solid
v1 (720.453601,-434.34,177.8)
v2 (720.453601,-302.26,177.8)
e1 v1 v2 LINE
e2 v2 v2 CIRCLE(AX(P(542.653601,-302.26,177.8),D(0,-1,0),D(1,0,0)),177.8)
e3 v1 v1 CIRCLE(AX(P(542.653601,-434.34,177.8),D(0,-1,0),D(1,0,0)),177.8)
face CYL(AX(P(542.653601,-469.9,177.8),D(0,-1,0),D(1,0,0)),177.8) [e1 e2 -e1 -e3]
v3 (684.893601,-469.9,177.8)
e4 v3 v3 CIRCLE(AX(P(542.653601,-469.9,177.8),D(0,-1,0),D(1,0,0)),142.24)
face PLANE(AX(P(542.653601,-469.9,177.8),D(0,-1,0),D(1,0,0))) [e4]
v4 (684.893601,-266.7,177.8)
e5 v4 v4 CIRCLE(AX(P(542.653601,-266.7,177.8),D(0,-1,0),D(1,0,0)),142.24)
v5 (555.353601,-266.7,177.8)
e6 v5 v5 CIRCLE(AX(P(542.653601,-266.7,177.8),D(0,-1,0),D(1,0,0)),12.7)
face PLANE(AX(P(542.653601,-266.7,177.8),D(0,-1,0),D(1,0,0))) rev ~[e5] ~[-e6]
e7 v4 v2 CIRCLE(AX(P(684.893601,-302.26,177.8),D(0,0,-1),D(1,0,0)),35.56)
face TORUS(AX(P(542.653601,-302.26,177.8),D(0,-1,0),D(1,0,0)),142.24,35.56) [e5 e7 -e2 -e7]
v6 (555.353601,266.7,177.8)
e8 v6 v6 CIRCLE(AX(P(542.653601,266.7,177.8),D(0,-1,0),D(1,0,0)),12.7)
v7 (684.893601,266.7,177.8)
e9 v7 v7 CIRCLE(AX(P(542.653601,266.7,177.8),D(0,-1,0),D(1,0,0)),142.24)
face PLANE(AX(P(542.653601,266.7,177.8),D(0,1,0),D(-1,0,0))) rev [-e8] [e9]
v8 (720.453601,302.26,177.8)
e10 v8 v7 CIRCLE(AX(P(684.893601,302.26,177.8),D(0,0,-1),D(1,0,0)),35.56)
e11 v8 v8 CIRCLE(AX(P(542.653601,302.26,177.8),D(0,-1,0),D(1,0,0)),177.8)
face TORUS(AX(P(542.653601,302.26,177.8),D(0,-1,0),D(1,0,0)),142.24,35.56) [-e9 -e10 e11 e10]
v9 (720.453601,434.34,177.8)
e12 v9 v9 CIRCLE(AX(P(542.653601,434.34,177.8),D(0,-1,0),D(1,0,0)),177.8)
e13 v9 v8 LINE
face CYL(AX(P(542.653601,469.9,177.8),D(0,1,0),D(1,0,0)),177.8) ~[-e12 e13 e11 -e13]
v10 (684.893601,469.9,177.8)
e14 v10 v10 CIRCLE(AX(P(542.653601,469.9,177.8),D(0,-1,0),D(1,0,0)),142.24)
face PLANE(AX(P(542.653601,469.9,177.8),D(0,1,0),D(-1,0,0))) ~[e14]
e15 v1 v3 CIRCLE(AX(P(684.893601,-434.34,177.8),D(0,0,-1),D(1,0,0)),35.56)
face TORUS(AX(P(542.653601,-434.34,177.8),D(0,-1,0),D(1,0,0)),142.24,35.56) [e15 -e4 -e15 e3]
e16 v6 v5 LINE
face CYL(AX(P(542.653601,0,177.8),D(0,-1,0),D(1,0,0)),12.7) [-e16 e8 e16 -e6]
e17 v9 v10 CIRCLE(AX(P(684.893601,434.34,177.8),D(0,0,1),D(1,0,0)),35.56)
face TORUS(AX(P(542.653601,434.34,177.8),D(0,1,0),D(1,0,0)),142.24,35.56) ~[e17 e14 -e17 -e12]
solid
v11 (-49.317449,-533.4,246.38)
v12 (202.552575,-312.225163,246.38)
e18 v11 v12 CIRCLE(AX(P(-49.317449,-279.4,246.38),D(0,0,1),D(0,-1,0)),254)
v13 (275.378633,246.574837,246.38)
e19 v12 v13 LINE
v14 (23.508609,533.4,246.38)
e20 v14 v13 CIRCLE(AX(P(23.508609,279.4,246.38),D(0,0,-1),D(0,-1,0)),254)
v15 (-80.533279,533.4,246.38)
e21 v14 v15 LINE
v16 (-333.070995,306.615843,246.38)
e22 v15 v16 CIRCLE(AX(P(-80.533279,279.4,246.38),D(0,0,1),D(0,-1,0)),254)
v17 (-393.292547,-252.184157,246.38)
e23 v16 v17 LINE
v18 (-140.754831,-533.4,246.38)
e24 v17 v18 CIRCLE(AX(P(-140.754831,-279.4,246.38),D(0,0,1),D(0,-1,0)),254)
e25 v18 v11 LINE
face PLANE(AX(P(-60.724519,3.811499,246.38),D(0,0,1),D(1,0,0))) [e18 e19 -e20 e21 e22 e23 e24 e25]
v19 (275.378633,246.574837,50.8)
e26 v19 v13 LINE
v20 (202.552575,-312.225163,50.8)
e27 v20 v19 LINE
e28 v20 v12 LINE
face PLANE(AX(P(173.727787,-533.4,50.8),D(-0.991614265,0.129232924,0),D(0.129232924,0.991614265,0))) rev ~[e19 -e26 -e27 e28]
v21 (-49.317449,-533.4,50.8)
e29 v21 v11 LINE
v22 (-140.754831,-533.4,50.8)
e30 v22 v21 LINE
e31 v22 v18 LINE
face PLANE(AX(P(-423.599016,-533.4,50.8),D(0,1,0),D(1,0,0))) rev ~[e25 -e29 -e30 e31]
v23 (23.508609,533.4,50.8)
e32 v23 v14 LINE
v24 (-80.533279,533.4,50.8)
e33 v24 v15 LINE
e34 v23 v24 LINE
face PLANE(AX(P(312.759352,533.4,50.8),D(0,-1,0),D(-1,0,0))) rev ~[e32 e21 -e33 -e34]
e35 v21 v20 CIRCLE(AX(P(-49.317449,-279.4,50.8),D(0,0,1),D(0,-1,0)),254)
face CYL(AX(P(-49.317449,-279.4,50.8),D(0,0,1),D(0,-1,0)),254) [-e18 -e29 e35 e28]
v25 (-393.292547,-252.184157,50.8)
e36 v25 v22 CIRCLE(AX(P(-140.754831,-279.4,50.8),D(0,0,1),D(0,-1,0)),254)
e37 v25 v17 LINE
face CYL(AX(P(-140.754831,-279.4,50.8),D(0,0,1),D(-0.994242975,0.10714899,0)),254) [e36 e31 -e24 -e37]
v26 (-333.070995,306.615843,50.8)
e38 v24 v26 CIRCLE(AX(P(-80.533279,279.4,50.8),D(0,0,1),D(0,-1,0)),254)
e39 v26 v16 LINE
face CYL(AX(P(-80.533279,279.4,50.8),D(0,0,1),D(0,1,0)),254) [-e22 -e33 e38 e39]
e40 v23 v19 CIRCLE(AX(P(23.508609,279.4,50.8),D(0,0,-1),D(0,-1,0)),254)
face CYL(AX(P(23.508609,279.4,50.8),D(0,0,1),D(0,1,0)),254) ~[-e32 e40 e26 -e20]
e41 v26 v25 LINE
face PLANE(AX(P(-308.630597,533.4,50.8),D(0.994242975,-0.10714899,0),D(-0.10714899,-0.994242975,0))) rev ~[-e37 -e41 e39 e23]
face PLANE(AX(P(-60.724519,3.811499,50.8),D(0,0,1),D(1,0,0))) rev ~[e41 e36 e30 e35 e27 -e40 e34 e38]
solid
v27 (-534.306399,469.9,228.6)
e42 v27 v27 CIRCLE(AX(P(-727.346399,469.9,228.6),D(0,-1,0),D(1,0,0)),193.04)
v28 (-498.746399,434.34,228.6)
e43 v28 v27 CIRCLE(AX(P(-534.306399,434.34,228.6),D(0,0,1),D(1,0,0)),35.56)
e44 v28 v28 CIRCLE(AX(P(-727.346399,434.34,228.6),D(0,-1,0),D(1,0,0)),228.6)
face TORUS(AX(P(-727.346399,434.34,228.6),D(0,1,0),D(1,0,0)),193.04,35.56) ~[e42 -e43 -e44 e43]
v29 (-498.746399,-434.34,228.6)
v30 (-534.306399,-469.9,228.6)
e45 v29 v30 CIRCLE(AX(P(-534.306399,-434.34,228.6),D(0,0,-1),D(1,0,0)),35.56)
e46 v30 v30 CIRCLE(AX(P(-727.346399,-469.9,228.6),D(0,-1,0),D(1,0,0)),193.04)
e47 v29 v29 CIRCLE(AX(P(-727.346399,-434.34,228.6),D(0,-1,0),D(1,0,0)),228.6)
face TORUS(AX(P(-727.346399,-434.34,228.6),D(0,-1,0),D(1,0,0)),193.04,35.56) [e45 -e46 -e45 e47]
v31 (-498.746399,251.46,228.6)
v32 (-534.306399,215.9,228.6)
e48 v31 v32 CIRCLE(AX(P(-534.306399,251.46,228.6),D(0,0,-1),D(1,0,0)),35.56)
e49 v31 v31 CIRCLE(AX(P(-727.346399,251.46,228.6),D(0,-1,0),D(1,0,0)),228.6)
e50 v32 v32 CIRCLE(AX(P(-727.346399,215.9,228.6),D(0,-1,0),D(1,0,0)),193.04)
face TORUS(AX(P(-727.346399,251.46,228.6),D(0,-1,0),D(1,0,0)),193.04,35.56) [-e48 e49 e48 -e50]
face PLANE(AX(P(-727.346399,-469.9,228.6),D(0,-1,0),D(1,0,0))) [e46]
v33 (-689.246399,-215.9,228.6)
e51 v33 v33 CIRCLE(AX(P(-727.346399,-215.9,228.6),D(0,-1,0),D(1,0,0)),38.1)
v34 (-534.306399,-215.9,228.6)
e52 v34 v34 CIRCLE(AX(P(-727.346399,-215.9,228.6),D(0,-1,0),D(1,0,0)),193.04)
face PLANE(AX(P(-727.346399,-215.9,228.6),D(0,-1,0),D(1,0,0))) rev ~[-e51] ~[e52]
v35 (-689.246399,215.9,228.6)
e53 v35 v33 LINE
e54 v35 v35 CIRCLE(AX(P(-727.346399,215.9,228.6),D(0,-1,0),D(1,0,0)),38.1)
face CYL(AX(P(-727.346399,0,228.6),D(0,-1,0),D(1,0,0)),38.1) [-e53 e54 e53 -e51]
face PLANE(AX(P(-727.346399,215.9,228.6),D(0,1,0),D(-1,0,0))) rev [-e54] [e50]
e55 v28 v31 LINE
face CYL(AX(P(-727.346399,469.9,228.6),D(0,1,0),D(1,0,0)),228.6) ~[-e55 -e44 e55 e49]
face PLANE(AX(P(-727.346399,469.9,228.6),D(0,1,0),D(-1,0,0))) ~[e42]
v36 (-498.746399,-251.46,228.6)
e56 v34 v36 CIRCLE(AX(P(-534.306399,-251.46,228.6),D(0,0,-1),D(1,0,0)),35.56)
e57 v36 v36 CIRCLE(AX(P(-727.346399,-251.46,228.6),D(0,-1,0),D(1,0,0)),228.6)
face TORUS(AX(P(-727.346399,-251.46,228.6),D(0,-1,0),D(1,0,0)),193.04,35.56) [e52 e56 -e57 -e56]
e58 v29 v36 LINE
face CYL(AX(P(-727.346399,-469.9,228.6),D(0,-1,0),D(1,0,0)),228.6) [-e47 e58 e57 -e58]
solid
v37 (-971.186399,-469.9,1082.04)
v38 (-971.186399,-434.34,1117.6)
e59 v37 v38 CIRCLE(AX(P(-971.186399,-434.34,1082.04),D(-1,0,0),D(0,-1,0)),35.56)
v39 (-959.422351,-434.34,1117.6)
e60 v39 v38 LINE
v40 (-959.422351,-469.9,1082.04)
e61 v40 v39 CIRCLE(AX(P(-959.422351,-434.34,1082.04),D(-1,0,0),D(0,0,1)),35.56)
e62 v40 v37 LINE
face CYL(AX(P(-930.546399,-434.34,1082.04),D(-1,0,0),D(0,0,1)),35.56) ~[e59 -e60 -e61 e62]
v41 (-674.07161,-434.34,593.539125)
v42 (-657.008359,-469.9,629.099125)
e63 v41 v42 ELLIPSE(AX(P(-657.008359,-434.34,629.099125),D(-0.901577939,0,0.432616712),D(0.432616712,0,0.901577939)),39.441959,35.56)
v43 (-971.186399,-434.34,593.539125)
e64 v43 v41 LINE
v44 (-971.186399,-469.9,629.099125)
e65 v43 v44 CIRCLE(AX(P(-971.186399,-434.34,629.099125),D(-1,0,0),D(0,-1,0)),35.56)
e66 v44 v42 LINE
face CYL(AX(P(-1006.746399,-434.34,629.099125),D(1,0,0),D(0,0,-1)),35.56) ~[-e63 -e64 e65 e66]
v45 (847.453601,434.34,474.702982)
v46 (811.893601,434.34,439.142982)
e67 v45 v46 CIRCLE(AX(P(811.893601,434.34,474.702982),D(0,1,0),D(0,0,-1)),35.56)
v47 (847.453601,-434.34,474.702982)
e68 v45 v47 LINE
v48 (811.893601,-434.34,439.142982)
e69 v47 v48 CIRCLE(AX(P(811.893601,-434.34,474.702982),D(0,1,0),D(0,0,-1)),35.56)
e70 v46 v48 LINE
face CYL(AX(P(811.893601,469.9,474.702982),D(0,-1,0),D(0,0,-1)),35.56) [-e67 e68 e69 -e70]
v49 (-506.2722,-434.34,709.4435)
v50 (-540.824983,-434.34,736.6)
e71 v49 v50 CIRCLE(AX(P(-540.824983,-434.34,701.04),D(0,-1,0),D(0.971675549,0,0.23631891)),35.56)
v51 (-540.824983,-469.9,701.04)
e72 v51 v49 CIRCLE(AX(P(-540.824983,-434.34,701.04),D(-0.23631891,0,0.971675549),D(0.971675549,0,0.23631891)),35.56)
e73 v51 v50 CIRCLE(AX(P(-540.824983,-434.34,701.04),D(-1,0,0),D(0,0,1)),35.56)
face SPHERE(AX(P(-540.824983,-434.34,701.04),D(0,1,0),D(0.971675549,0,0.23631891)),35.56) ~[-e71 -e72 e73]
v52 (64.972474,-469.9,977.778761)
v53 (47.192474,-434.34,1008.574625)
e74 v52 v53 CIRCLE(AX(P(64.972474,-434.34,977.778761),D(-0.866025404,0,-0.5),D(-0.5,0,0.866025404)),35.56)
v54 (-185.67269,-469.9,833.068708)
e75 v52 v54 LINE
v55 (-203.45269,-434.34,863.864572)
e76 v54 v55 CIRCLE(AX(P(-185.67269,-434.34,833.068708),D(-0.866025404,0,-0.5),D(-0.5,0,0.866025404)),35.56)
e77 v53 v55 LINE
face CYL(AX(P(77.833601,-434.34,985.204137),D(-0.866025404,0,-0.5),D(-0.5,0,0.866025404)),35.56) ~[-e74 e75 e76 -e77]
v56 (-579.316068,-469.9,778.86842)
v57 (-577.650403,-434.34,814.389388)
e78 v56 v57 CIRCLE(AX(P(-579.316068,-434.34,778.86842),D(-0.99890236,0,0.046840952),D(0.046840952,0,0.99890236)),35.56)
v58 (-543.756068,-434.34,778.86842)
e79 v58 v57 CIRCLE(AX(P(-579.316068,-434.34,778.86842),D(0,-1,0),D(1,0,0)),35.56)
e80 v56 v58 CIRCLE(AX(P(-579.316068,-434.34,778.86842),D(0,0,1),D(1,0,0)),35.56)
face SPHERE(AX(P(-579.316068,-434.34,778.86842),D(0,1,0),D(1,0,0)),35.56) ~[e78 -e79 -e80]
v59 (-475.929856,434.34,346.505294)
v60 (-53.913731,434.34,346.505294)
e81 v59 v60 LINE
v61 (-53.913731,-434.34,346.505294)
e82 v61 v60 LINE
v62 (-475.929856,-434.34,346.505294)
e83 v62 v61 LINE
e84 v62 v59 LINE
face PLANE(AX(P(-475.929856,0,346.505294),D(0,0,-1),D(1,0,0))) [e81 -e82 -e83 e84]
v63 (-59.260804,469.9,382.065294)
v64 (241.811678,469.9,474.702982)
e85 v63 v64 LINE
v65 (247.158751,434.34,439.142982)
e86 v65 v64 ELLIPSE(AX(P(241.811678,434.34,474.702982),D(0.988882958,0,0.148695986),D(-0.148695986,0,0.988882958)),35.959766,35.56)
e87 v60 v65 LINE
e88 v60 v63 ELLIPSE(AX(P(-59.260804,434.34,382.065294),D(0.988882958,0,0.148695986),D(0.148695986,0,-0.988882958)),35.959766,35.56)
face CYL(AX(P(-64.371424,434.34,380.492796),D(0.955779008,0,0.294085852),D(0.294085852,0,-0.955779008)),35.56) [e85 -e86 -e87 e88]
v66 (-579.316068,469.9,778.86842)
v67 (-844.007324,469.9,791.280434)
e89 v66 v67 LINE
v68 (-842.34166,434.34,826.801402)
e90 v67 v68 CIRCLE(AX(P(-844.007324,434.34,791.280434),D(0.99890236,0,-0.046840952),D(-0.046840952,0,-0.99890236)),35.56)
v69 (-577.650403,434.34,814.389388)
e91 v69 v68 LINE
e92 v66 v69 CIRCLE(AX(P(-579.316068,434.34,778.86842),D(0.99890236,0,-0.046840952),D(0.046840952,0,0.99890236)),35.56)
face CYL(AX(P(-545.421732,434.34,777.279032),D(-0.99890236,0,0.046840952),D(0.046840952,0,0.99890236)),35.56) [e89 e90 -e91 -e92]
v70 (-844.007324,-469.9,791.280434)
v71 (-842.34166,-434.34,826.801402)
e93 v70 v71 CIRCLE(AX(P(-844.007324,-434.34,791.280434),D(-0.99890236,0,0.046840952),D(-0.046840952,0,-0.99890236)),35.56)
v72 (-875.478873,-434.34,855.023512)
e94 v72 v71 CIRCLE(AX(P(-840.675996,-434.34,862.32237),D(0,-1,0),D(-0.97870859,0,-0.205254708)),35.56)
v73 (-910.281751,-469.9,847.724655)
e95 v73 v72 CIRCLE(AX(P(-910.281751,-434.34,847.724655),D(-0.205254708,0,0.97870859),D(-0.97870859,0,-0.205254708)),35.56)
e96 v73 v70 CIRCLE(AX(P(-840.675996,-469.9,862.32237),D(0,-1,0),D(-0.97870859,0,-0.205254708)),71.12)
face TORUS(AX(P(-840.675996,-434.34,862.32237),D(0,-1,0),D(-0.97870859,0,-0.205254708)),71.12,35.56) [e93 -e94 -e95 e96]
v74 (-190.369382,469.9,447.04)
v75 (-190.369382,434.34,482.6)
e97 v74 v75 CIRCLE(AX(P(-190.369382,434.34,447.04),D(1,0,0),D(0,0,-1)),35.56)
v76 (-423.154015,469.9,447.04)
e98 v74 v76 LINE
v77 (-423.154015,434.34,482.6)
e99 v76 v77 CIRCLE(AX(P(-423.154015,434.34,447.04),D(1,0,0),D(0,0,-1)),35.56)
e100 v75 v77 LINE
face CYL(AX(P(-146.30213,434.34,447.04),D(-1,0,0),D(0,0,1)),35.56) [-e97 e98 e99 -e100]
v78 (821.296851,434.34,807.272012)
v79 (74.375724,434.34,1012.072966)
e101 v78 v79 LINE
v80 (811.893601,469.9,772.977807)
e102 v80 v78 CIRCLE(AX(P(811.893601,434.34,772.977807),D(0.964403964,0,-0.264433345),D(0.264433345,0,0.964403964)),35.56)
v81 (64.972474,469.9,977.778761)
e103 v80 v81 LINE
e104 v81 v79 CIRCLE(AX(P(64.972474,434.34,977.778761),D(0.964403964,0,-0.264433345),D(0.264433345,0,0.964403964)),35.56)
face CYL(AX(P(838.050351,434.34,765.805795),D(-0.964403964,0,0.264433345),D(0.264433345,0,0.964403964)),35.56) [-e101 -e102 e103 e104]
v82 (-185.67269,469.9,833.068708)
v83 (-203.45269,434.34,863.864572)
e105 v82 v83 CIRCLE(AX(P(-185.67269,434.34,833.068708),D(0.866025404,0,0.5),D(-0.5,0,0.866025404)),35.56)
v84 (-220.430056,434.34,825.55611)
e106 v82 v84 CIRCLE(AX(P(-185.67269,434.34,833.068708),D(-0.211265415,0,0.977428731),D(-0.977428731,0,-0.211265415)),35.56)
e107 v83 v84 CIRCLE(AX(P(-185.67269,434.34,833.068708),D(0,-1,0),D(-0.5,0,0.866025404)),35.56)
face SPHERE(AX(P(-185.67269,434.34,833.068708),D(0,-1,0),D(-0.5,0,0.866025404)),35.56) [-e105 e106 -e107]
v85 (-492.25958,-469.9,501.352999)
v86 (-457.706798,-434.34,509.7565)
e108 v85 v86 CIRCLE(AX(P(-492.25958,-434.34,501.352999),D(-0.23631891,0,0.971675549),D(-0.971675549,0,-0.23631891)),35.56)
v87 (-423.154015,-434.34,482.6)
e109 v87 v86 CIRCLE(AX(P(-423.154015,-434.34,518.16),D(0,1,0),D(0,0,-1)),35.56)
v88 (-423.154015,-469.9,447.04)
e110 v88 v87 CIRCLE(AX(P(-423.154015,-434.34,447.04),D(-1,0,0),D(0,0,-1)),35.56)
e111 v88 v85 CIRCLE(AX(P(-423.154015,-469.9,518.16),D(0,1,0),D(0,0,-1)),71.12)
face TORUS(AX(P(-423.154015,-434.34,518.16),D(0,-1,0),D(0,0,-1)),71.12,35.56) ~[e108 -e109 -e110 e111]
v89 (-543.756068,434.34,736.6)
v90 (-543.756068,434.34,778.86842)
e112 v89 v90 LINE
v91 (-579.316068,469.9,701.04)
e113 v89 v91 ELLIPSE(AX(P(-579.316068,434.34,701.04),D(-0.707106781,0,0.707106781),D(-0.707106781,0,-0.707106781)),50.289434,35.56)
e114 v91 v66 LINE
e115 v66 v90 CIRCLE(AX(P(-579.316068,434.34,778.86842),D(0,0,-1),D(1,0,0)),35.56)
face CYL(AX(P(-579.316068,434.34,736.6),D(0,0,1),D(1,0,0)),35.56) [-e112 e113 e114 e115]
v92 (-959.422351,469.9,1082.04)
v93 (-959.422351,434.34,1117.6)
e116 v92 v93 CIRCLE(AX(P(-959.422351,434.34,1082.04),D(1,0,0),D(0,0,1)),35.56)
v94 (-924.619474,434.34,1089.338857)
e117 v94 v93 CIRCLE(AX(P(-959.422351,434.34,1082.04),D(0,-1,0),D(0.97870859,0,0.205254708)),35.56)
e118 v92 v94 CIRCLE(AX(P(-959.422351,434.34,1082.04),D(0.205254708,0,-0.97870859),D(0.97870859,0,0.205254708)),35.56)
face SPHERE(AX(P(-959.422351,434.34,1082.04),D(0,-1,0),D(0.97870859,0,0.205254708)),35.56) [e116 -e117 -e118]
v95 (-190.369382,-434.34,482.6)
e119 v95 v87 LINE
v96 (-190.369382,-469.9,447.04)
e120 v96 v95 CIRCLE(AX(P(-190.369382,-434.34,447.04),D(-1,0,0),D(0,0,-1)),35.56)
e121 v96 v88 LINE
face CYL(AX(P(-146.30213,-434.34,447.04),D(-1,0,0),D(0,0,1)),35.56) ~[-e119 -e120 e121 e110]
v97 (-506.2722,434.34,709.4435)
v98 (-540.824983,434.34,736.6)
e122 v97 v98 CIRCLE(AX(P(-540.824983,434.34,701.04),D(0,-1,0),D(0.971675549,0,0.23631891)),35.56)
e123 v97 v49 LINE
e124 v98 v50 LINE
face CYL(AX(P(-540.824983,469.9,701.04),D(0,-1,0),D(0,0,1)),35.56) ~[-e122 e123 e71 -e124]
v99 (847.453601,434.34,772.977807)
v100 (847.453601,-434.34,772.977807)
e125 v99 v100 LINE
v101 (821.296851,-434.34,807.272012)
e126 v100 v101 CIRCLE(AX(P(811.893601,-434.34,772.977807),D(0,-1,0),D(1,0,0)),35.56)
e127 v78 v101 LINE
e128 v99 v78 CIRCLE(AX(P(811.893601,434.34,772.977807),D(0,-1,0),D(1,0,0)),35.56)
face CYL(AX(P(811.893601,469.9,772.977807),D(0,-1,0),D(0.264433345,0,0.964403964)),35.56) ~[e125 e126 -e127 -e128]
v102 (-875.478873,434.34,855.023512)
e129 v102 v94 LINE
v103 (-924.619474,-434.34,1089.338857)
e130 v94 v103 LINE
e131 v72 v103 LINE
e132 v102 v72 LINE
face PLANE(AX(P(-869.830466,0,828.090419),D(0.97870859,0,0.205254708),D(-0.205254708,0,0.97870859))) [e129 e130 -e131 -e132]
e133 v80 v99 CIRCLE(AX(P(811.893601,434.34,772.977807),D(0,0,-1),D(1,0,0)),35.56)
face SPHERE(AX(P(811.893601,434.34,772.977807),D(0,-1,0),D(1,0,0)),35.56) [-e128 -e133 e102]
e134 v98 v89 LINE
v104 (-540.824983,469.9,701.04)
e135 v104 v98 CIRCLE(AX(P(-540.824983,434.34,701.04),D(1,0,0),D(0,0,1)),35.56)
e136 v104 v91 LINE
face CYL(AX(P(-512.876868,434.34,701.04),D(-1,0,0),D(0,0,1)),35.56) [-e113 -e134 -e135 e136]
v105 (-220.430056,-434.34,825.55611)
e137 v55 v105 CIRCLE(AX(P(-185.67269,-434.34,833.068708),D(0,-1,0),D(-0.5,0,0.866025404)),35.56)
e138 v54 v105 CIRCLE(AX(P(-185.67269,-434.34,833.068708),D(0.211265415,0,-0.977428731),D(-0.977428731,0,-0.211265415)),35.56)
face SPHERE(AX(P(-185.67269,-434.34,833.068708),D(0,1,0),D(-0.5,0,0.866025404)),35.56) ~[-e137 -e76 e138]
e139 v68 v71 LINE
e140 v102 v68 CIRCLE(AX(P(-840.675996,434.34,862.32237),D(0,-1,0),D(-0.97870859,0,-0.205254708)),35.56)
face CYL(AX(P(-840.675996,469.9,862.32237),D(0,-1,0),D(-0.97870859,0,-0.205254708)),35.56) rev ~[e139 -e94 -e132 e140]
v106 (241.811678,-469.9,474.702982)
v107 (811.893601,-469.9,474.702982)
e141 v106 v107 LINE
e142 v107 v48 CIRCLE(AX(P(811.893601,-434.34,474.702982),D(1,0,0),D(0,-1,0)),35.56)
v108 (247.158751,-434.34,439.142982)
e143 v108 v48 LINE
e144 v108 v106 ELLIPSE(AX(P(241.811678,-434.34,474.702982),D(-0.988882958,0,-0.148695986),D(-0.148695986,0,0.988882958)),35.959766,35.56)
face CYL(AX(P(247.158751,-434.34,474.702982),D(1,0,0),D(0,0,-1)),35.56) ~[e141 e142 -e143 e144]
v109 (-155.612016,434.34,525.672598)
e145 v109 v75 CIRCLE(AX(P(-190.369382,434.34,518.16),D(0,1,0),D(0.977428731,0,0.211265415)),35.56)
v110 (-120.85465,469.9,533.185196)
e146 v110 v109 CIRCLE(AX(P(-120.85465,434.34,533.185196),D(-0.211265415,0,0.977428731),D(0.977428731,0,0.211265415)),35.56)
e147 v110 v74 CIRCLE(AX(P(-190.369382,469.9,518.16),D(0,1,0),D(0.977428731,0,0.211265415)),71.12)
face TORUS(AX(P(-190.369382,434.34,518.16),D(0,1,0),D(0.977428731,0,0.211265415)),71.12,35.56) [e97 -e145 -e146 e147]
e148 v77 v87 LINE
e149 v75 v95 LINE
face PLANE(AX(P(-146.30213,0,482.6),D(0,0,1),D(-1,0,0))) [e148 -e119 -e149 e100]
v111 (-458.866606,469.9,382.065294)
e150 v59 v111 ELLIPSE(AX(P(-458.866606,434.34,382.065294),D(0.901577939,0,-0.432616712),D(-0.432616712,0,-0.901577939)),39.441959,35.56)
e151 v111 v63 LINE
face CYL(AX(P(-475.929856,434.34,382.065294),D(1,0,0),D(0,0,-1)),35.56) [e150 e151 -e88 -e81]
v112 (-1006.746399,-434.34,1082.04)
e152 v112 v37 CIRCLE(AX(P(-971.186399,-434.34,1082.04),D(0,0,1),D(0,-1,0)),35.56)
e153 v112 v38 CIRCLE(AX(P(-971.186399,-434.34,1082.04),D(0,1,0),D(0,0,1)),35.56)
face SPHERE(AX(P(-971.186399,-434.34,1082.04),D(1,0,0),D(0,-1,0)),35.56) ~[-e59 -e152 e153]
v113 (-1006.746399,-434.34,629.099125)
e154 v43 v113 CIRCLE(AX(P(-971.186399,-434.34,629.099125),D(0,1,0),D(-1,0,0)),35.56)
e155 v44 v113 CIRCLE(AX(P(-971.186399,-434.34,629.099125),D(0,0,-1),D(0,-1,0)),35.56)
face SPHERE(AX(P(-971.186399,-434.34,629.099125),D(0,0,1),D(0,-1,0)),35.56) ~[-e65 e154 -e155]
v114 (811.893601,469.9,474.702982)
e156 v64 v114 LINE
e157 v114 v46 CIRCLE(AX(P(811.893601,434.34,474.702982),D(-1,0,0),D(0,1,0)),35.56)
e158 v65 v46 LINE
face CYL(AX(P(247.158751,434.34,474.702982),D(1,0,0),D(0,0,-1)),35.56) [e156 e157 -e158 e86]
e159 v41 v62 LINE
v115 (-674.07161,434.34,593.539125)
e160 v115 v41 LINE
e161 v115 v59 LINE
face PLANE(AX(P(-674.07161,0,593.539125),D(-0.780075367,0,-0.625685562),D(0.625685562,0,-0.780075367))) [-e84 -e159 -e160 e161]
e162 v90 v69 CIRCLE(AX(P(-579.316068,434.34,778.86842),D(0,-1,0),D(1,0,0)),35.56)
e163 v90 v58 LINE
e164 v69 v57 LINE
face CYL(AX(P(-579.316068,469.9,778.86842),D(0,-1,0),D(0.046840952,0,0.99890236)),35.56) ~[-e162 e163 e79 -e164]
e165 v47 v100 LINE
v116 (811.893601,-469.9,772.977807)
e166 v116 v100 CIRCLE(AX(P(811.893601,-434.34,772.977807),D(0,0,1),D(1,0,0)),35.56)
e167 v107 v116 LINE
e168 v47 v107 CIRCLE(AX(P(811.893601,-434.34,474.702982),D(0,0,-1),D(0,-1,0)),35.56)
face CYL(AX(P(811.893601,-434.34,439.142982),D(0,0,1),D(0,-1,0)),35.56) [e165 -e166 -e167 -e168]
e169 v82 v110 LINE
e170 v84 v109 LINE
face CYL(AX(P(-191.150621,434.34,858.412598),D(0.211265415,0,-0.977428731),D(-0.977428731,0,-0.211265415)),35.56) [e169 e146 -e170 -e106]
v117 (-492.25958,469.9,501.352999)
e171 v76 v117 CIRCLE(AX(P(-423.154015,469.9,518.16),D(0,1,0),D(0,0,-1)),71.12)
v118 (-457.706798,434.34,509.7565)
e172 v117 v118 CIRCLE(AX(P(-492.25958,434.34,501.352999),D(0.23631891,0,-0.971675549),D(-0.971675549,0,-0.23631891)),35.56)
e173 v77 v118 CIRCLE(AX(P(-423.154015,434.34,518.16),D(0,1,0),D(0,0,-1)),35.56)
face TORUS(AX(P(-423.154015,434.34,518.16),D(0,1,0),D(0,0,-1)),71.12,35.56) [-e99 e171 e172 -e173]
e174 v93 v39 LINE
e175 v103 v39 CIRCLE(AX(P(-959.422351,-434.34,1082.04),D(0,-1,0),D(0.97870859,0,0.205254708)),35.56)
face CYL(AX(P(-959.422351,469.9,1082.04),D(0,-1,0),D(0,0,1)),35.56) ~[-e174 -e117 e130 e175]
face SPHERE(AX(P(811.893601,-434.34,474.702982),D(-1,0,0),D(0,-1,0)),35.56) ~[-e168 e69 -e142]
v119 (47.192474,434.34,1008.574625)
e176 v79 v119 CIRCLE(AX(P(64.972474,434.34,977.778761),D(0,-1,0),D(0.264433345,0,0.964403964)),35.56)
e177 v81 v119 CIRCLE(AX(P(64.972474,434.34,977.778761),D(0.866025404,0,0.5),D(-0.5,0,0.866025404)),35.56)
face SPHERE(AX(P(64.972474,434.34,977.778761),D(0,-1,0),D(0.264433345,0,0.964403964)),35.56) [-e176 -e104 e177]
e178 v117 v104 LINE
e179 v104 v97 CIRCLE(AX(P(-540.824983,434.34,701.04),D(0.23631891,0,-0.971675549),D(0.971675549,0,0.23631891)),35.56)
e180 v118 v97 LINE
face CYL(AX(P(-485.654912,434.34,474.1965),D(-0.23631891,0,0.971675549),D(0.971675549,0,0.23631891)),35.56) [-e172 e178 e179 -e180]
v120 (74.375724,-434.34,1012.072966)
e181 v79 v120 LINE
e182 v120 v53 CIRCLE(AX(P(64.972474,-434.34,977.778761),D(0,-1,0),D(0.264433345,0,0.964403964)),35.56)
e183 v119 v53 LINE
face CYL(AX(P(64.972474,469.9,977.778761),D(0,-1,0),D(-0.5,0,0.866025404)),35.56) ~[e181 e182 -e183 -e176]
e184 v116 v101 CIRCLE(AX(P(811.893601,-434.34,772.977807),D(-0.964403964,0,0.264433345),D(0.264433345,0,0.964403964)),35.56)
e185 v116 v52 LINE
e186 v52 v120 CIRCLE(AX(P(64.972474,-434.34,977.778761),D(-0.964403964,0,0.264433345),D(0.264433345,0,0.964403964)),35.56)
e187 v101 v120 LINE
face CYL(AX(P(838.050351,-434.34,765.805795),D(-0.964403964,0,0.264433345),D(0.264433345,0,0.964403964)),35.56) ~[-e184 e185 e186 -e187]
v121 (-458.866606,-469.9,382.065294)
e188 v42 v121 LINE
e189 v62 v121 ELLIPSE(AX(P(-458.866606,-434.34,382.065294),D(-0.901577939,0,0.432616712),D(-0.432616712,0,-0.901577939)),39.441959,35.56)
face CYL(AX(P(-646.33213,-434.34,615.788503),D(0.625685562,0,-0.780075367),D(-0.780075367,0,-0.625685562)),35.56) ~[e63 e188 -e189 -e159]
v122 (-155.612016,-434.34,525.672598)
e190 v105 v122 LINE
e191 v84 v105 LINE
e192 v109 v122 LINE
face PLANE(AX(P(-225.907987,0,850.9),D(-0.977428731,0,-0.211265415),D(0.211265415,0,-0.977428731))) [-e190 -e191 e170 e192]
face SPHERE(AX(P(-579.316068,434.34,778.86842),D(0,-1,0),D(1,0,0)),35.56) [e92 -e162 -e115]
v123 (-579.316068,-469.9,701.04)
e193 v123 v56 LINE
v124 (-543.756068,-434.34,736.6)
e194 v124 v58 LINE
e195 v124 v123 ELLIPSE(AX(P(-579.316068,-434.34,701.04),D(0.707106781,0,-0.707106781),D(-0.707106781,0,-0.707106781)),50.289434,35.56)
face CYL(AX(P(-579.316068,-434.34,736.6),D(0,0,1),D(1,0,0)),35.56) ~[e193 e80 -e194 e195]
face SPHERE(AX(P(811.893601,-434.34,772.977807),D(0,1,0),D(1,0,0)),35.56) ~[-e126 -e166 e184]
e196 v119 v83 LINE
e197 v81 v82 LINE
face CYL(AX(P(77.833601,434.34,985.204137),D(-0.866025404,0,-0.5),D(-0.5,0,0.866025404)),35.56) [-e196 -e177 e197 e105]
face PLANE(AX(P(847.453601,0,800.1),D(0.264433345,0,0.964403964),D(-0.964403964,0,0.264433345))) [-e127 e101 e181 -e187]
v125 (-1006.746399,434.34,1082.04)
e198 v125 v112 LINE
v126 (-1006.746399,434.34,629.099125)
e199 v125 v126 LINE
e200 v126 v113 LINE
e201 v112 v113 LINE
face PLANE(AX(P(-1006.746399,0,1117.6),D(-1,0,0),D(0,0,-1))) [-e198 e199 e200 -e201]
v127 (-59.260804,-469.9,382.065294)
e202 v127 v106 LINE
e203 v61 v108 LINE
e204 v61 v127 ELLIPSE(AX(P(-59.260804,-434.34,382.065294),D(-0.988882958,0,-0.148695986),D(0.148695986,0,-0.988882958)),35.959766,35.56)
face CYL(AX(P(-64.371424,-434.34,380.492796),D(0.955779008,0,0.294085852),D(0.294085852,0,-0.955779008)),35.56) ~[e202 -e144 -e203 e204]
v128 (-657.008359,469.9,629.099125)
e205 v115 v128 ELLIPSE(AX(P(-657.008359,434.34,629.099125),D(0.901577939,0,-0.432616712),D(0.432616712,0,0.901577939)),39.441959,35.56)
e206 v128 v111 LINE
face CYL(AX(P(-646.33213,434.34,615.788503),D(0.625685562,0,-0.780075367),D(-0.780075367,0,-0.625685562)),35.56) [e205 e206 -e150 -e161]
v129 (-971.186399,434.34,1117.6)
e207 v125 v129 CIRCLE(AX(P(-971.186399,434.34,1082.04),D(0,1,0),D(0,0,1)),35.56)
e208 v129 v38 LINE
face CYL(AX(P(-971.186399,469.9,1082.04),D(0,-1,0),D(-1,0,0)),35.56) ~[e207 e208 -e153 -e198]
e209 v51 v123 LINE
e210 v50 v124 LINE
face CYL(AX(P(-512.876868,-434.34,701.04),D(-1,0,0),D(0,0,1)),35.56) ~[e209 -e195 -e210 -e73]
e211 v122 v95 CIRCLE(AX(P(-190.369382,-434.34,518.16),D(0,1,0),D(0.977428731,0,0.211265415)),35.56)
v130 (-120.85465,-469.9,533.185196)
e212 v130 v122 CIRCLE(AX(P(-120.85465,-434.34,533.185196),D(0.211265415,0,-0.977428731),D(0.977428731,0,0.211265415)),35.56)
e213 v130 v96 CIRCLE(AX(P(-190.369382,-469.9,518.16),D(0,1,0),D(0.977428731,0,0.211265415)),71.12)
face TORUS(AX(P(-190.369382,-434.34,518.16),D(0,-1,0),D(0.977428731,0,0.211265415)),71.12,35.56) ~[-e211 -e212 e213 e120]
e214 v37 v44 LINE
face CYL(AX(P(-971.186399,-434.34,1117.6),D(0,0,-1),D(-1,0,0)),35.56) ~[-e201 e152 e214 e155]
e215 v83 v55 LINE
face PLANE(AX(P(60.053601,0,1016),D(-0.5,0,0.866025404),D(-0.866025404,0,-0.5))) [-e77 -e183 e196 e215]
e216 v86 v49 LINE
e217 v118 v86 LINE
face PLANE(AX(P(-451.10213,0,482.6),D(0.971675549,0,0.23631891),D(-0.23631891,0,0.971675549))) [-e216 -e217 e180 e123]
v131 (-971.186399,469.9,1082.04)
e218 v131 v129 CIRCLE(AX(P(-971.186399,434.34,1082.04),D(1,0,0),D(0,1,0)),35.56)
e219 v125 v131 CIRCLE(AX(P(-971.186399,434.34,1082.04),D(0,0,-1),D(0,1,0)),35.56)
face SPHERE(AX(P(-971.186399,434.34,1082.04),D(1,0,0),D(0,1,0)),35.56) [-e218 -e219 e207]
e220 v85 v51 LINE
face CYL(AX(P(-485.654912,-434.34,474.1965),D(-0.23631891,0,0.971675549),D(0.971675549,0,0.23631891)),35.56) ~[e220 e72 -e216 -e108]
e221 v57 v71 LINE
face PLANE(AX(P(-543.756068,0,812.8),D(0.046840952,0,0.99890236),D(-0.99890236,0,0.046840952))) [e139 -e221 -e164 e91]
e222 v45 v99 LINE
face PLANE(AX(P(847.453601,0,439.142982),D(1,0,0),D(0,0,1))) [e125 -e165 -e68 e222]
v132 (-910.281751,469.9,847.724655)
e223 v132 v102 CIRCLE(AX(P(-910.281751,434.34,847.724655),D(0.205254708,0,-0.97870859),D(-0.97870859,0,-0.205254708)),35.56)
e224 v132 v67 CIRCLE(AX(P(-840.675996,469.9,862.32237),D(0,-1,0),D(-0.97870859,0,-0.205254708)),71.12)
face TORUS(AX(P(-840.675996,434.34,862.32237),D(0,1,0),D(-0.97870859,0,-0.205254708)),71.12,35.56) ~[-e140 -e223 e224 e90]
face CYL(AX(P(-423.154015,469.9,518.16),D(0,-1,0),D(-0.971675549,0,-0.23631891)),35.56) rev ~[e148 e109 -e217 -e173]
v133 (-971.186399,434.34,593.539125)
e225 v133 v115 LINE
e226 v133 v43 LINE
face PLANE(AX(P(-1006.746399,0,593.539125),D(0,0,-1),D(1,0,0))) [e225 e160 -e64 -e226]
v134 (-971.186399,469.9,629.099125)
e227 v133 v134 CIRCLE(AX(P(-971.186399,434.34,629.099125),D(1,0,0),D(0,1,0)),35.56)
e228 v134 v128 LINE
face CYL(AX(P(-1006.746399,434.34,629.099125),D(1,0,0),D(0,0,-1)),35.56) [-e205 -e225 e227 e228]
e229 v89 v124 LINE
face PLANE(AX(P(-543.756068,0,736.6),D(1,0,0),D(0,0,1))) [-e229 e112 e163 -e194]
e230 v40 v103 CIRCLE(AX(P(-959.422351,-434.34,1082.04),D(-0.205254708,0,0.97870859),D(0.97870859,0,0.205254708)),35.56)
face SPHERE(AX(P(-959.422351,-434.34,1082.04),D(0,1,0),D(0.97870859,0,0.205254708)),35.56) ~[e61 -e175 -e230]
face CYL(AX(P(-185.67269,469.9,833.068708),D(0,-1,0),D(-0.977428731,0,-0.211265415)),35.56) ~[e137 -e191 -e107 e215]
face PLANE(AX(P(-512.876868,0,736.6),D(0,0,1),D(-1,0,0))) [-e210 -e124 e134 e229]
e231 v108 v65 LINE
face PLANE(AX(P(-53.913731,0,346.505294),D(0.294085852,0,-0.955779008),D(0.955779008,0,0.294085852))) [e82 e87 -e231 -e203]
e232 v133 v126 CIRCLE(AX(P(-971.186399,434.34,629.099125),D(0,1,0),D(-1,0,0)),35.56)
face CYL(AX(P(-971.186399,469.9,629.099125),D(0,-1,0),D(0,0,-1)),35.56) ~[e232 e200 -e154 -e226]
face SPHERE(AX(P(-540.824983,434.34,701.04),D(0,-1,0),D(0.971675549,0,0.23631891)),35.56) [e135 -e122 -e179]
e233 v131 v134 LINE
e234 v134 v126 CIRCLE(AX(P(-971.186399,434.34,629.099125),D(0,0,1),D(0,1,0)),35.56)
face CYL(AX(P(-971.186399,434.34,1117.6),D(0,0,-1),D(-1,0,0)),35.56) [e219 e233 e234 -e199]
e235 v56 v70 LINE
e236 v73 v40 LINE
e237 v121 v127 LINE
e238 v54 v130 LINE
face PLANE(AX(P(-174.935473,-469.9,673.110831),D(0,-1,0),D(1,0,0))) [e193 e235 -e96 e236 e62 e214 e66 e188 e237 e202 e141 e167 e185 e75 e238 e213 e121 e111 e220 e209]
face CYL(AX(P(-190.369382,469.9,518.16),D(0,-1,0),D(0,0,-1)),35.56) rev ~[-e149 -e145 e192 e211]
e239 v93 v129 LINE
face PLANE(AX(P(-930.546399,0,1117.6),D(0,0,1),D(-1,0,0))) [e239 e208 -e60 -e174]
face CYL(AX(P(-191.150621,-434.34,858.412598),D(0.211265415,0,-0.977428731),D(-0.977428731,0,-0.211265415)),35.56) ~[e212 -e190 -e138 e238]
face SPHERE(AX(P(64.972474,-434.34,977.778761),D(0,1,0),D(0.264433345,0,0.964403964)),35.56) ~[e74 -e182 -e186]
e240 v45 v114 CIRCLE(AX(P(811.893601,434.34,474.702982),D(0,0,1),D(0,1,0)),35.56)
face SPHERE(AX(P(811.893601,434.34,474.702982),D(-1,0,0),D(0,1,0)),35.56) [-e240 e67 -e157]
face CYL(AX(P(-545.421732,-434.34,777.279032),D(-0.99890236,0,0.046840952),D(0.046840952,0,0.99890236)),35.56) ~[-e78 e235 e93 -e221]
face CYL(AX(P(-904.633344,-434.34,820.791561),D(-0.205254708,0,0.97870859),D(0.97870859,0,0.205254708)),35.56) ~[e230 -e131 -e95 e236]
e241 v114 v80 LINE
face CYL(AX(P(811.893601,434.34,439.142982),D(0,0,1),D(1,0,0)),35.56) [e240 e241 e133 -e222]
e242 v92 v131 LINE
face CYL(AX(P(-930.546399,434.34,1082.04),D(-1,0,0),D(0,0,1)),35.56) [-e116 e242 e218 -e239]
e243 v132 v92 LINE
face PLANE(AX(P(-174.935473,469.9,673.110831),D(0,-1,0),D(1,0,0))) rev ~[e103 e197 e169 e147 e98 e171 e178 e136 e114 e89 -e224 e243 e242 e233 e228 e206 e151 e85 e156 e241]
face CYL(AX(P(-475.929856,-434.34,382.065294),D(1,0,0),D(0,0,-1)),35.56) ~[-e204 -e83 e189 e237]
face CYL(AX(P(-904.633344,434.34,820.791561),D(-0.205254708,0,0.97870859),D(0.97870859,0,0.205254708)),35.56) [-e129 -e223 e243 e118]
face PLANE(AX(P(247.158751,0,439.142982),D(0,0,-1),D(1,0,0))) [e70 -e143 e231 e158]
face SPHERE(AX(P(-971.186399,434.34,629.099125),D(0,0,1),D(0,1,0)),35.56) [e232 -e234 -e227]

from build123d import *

# Parameters (mm, degrees)
F1_DEPTH  = 469.9
F2_R      = 38.1
F3_DEPTH  = 469.9
F2_R_2    = 12.7
F4_R      = 228.6
F5_DEPTH  = 254
F6_R      = 177.8
F7_DEPTH  = 203.2
F9_R      = 35.56
F9_2_R    = 35.56
F14_DEPTH = 195.58
F15_R     = 254


# Not quite as in the source:
# - a feature names something its author has since deleted; it is built from what else it names


with BuildPart() as f1:
    # F0 (on Front) → F1 (new body, symmetric)
    with BuildSketch(Plane.XZ):
        Polygon((247.1587508917, 439.1429820538), (847.4536012151, 439.1429820538), (847.4536012151, 800.1), (60.0536012151, 1016), (-225.9079871145, 850.9), (-146.3021296523, 482.6), (-451.1021296523, 482.6), (-512.876868248, 736.6), (-543.7560677528, 736.6), (-543.7560677528, 812.8), (-869.8304663276, 828.0904187125), (-930.5463987849, 1117.6), (-1006.7463987849, 1117.6), (-1006.7463987849, 593.5391248643), (-674.0716099739, 593.5391248643), (-475.9298563004, 346.5052941322), (-53.913731128, 346.5052941322), align=None)
    extrude(amount=F1_DEPTH, both=True)

    # F9
    f9_edges = [f1.edges().sort_by_distance(p)[0] for p in [
        (-900.188433, -469.9, 972.845209),
        (-968.646399, -469.9, 1117.6),
        (-1006.746399, -469.9, 855.569562),
        (-840.409004, -469.9, 593.539125),
        (-575.000733, -469.9, 470.022209),
        (-264.921794, -469.9, 346.505294),
        (96.62251, -469.9, 392.824138),
        (547.306176, -469.9, 439.142982),
        (847.453601, -469.9, 619.621491),
        (453.753601, -469.9, 908.05),
        (-82.927193, -469.9, 933.45),
        (-186.105058, -469.9, 666.75),
        (-298.70213, -469.9, 482.6),
        (-481.989499, -469.9, 609.6),
        (-528.316468, -469.9, 736.6),
        (-543.756068, -469.9, 774.7),
        (-706.793267, -469.9, 820.445209),
        (-900.188433, 469.9, 972.845209),
        (-968.646399, 469.9, 1117.6),
        (-1006.746399, 469.9, 855.569562),
        (-840.409004, 469.9, 593.539125),
        (-575.000733, 469.9, 470.022209),
        (-264.921794, 469.9, 346.505294),
        (96.62251, 469.9, 392.824138),
        (547.306176, 469.9, 439.142982),
        (847.453601, 469.9, 619.621491),
        (453.753601, 469.9, 908.05),
        (-82.927193, 469.9, 933.45),
        (-186.105058, 469.9, 666.75),
        (-298.70213, 469.9, 482.6),
        (-481.989499, 469.9, 609.6),
        (-528.316468, 469.9, 736.6),
        (-543.756068, 469.9, 774.7),
        (-706.793267, 469.9, 820.445209),
        (847.453601, 0, 800.1),
        (60.053601, 0, 1016),
        (847.453601, 0, 439.142982),
        (-225.907987, 0, 850.9),
        (-146.30213, 0, 482.6),
        (-451.10213, 0, 482.6),
        (-869.830466, 0, 828.090419),
        (-543.756068, 0, 812.8),
        (-930.546399, 0, 1117.6),
        (-1006.746399, 0, 1117.6),
        (-1006.746399, 0, 593.539125),
        (-512.876868, 0, 736.6),
    ]]
    fillet(f9_edges, radius=F9_R)


with BuildPart() as f3:
    # F2 (on Front) → F3 (new body, symmetric)
    with BuildSketch(Plane.XZ):
        with Locations((-727.3463987849, 228.6)):
            Circle(F2_R)
    extrude(amount=F3_DEPTH, both=True)

    # F4 (on face) → F5 (join)
    with BuildSketch(Plane.XZ.offset(469.9)):
        with Locations((-727.3463987849, 228.6)):
            Circle(F4_R)
    extrude(amount=-F5_DEPTH)



with BuildPart() as f3b:
    # F2 (on Front) → F3, piece 2 (new body, symmetric)
    with BuildSketch(Plane.XZ):
        with Locations((542.6536012151, 177.8)):
            Circle(F2_R_2)
    extrude(amount=F3_DEPTH, both=True)

    # F6 (on face) → F7 (join)
    with BuildSketch(Plane.XZ.offset(469.9)):
        with Locations((542.6536012151, 177.8)):
            Circle(F6_R)
    extrude(amount=-F7_DEPTH)


with BuildPart() as f3_1:
    add(f3.part)

    add(f3b.part)  # F8 merges F3b
    # F8: F3, F3b across plane
    add(f3.part.mirror(Plane.XZ))
    add(f3b.part.mirror(Plane.XZ))

    # F9#2
    f9_2_edges = [f3_1.edges().sort_by_distance(p)[0] for p in [
        (-498.746399, -342.9, 228.6),
        (-955.946399, -469.9, 228.6),
        (-955.946399, -215.9, 228.6),
        (-498.746399, 342.9, 228.6),
        (-955.946399, 469.9, 228.6),
        (-955.946399, 215.9, 228.6),
        (720.453601, -368.3, 177.8),
        (364.853601, -469.9, 177.8),
        (364.853601, -266.7, 177.8),
        (720.453601, 368.3, 177.8),
        (364.853601, 469.9, 177.8),
        (364.853601, 266.7, 177.8),
    ]]
    fillet(f9_2_edges, radius=F9_2_R)


with BuildPart() as f14:
    # F13 (on offset) → F14 (new body)
    with BuildSketch(Plane.XY.offset(50.8)):
        Polygon((312.7593517316, 533.4), (-308.6305973146, 533.4), (-423.5990158775, -533.4), (173.7277868513, -533.4), align=None)
    extrude(amount=F14_DEPTH)

    # F15
    f15_edges = [f14.edges().sort_by_distance(p)[0] for p in [
        (173.727787, -533.4, 148.59),
        (-423.599016, -533.4, 148.59),
        (312.759352, 533.4, 148.59),
        (-308.630597, 533.4, 148.59),
    ]]
    fillet(f15_edges, radius=F15_R)


solid = Compound([f1.part, f3_1.part, f14.part])
